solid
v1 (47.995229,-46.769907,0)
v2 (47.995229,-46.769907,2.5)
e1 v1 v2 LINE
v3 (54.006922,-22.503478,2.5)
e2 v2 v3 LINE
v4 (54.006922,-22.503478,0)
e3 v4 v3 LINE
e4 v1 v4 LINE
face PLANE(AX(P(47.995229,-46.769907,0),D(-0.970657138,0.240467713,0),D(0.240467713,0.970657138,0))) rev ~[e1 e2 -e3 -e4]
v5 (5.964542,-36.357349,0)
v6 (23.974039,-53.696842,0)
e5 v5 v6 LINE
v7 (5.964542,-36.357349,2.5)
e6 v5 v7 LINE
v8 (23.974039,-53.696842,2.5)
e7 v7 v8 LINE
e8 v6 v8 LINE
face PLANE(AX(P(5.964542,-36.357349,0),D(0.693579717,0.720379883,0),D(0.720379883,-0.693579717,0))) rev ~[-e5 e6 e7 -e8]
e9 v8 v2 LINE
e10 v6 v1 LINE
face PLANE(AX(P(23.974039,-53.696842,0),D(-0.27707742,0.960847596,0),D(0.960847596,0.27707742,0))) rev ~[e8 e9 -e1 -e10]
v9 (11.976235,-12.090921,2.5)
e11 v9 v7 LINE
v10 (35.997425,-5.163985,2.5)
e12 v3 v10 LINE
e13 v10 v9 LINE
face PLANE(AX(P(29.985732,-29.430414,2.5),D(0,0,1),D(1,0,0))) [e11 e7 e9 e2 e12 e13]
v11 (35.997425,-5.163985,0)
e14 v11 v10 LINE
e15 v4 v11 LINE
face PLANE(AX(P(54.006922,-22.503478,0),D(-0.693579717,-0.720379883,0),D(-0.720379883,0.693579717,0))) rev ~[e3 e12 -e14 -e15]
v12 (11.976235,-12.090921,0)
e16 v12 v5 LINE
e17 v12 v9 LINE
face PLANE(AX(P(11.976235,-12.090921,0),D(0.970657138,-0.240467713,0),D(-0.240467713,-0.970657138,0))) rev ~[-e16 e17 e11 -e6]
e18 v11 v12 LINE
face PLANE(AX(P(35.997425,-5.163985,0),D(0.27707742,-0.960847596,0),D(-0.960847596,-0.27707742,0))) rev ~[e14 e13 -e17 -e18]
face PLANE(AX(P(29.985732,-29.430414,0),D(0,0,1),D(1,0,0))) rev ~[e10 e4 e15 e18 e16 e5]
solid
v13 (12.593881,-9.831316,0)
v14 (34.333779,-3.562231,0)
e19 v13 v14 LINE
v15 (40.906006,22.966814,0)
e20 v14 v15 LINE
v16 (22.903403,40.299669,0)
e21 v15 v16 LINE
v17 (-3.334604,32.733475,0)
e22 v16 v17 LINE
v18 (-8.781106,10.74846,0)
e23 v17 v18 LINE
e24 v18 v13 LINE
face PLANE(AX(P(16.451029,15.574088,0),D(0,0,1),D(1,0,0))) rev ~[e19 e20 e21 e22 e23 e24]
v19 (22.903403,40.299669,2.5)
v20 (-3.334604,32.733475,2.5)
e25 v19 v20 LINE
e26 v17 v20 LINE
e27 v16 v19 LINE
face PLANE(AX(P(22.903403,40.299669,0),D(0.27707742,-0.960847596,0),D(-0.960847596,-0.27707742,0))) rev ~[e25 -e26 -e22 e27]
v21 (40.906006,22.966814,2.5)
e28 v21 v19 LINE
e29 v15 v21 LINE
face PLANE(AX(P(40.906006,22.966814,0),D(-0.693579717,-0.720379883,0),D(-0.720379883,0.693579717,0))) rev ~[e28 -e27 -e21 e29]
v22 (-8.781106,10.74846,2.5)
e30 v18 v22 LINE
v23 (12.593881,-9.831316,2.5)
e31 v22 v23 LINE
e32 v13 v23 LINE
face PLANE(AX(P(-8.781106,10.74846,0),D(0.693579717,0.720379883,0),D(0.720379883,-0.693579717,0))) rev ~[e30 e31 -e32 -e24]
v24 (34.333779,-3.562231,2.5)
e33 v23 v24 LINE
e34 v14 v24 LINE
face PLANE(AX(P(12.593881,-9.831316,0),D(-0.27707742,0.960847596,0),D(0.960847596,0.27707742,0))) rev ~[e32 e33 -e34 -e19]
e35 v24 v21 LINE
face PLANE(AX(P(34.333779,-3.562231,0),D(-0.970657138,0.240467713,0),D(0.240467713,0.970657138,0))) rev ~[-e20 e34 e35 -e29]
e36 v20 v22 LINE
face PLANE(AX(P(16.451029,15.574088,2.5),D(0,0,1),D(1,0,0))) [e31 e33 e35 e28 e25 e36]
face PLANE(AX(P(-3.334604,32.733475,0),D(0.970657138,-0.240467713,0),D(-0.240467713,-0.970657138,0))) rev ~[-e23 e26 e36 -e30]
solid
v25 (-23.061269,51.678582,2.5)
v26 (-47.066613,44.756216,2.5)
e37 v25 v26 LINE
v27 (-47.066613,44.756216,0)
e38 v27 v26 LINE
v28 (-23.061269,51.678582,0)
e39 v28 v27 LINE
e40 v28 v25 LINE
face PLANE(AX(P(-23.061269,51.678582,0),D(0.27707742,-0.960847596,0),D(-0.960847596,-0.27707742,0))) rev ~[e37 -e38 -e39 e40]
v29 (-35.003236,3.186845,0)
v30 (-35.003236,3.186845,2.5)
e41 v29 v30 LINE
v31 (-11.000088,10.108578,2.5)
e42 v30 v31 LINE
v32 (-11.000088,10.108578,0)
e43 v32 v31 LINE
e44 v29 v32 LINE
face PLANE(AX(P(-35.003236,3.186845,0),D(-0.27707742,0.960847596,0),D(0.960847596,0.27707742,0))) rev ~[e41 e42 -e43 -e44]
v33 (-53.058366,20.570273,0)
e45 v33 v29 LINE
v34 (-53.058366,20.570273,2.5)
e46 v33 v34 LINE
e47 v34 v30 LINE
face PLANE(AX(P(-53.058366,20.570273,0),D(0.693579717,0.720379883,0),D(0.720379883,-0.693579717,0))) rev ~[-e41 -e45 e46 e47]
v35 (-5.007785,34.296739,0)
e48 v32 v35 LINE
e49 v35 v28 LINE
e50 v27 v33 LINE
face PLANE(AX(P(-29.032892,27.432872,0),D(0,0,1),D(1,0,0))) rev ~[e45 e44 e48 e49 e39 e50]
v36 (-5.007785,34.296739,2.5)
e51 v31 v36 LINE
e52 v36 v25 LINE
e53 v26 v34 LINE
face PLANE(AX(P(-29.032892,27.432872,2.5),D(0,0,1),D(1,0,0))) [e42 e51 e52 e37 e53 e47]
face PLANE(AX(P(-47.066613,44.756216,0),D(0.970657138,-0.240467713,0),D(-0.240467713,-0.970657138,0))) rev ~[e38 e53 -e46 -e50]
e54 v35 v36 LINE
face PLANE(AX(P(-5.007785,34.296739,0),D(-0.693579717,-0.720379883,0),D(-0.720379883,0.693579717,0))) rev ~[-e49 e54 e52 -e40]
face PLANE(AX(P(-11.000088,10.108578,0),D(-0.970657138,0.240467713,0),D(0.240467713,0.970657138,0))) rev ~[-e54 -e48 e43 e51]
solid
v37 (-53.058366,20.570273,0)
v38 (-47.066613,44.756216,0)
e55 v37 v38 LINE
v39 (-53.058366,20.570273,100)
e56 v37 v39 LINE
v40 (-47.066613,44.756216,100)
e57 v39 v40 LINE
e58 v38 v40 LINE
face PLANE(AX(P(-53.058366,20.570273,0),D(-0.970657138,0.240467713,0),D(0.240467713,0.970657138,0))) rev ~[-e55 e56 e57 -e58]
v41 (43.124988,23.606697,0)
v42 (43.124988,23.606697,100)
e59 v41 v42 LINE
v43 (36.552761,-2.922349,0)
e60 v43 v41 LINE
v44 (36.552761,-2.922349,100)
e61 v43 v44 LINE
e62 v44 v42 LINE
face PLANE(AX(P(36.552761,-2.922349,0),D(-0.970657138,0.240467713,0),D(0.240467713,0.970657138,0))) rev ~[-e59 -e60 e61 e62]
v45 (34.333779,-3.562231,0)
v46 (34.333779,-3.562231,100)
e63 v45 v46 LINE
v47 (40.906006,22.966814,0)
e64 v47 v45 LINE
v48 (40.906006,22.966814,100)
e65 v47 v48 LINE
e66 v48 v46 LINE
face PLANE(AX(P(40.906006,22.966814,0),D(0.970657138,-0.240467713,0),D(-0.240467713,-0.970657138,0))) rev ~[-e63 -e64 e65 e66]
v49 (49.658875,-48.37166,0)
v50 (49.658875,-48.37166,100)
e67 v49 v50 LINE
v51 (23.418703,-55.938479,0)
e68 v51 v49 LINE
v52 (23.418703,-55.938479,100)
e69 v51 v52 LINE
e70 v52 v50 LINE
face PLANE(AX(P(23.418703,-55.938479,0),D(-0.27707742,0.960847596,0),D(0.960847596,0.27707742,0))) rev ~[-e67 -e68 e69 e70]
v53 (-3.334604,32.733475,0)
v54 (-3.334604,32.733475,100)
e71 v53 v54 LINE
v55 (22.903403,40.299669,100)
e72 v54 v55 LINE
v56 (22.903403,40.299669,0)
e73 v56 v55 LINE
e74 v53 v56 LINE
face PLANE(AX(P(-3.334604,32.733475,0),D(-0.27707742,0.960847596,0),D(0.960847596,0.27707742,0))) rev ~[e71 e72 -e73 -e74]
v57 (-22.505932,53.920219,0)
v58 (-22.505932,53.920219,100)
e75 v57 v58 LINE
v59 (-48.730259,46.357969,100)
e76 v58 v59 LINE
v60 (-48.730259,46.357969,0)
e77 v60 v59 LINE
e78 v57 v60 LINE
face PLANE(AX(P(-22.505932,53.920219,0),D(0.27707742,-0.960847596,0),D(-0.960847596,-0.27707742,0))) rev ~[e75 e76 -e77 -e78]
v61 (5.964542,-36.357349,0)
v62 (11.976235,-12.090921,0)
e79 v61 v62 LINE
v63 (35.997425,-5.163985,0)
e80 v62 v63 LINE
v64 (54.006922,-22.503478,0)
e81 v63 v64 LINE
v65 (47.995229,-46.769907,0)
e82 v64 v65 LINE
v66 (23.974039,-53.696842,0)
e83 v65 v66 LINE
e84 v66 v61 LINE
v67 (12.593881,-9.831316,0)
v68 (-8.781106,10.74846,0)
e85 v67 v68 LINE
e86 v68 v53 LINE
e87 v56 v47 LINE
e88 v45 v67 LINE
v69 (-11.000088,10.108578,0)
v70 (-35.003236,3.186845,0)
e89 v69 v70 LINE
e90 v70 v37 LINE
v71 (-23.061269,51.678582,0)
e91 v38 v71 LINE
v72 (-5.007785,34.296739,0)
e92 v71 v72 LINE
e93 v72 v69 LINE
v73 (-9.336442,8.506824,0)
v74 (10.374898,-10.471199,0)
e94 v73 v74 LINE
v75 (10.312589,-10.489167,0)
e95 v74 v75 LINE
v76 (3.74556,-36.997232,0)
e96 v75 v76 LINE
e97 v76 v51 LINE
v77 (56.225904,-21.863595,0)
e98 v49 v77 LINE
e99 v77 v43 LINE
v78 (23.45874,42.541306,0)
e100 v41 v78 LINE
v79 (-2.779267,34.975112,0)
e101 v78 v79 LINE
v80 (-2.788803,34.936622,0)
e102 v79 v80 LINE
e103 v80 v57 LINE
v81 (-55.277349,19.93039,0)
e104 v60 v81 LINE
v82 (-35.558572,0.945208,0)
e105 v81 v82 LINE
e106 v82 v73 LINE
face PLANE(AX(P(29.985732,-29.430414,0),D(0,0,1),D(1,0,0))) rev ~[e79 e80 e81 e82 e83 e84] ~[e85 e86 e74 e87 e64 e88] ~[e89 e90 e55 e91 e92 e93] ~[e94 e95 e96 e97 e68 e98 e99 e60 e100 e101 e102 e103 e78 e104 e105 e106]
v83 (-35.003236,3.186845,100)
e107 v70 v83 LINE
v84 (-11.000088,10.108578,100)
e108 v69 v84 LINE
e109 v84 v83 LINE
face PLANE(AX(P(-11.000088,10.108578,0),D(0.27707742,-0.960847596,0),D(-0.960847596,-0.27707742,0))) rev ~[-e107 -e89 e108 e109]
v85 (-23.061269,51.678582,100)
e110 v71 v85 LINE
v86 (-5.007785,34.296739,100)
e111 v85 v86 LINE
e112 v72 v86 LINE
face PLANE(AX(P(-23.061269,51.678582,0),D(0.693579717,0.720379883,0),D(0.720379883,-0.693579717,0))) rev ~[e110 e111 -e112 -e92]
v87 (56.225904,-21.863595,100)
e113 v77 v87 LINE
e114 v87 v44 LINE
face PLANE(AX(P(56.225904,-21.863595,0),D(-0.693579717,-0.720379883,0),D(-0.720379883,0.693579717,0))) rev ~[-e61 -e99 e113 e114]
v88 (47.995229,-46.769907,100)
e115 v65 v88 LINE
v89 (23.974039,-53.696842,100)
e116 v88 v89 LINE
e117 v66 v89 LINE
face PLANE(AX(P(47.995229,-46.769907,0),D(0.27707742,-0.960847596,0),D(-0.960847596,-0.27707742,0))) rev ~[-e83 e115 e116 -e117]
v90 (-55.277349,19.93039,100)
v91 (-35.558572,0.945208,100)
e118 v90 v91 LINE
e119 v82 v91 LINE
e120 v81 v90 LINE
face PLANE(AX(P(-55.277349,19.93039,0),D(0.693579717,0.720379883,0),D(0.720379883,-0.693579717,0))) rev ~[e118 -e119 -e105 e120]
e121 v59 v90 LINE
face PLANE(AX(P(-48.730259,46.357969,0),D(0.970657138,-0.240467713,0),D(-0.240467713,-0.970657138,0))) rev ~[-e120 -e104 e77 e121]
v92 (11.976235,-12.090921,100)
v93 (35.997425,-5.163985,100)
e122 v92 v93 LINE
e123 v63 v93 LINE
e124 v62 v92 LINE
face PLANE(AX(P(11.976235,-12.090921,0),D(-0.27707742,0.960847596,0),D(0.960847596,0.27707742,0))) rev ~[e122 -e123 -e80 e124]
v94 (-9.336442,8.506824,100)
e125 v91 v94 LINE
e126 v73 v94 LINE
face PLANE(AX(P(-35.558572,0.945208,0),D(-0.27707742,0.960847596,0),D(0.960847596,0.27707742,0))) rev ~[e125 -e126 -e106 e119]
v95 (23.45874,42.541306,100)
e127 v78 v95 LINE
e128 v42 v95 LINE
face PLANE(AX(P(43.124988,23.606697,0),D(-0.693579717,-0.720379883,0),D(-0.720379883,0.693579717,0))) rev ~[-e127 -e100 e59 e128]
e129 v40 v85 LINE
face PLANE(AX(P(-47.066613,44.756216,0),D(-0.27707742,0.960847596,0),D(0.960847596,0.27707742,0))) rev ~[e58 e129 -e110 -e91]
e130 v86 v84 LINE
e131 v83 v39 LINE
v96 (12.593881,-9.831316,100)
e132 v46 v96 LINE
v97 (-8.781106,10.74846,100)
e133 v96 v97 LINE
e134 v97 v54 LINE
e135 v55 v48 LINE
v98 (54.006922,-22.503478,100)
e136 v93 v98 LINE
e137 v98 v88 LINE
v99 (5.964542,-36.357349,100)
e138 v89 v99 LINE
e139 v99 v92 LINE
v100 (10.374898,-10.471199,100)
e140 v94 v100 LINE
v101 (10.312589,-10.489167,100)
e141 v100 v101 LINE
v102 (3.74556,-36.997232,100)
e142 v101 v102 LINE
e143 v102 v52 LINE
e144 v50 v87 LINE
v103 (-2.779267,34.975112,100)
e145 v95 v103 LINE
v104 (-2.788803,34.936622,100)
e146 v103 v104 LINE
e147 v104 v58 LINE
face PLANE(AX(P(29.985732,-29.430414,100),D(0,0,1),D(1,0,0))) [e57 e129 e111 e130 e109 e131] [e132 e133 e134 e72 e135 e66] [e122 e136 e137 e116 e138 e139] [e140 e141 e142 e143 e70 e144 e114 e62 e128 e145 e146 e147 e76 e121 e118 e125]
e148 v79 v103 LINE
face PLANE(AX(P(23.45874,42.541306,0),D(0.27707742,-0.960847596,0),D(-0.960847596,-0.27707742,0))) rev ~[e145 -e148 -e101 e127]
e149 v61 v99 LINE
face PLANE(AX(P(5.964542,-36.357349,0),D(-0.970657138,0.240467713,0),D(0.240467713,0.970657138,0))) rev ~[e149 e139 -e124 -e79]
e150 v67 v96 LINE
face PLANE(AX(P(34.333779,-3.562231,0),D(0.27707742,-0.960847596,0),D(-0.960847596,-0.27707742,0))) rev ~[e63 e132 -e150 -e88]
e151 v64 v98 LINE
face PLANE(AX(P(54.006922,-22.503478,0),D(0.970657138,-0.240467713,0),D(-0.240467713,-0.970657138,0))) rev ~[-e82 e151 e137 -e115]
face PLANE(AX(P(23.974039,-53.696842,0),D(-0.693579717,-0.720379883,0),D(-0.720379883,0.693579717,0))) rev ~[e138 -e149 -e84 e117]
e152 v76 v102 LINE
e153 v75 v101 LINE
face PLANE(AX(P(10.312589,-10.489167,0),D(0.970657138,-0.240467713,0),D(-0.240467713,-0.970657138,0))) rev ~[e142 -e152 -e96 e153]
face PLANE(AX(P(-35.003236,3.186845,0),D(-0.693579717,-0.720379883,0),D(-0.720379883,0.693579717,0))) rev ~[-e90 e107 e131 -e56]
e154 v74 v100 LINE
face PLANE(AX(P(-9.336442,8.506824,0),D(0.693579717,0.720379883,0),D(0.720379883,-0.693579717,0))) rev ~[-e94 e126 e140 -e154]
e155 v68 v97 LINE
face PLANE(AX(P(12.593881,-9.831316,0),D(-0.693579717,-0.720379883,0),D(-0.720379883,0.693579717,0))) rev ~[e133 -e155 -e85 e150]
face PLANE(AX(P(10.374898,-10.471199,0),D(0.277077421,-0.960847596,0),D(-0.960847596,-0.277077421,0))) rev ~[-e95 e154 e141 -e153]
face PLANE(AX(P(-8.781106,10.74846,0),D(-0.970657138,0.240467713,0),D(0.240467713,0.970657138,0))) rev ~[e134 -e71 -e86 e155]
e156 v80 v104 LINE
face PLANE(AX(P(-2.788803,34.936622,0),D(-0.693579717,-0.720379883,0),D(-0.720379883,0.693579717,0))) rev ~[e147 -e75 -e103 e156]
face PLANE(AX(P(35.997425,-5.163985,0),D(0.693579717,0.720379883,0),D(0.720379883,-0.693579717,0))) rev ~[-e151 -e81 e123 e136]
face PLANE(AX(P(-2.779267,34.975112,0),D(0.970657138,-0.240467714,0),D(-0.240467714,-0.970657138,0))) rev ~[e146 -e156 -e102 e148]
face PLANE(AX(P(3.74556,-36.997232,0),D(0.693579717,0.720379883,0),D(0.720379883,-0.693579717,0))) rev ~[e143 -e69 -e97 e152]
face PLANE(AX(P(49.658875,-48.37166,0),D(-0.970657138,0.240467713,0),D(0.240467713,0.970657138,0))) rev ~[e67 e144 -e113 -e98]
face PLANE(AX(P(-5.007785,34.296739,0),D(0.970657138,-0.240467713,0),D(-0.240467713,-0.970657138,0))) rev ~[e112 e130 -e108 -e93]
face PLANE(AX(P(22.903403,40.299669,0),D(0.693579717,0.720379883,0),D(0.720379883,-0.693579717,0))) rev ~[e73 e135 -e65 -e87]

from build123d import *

# Parameters (mm, degrees)
F1_DEPTH = 2.5
F2_DEPTH = 100


with BuildPart() as f1:
    # F0 (on Top) → F1 (new body)
    with BuildSketch(Plane.XY):
        Polygon((23.9740391848, -53.6968420277), (47.9952290893, -46.7699065169), (54.0069219188, -22.503478075), (35.9974248438, -5.163985144), (11.9762349393, -12.0909206548), (5.9645421098, -36.3573490966), align=None)
    extrude(amount=F1_DEPTH)


with BuildPart() as f1b:
    # F0 (on Top) → F1, piece 2 (new body)
    with BuildSketch(Plane.XY):
        Polygon((12.5938805561, -9.8313160485), (34.3337787663, -3.5622313982), (40.9060056961, 22.9668144158), (22.9034034312, 40.2996690431), (-3.3346036331, 32.7334750457), (-8.7811057818, 10.7484604419), align=None)
    extrude(amount=F1_DEPTH)


with BuildPart() as f1c:
    # F0 (on Top) → F1, piece 3 (new body)
    with BuildSketch(Plane.XY):
        Polygon((-35.0032359624, 3.1868448251), (-11.0000882551, 10.1085775488), (-5.0077850981, 34.2967388346), (-23.0612686958, 51.6785818655), (-47.0666128749, 44.7562157503), (-53.0583663292, 20.5702733605), align=None)
    extrude(amount=F1_DEPTH)


with BuildPart() as f2:
    # F0 (on Top) → F2 (new body)
    with BuildSketch(Plane.XY):
        Polygon((56.225904392, -21.8635951819), (36.5527612395, -2.9223485051), (34.3337787663, -3.5622313982), (12.5938805561, -9.8313160485), (10.3748980829, -10.4711989416), (10.3125888618, -10.489166909), (3.7455596365, -36.9972319897), (23.418702789, -55.9384786666), (49.6588751668, -48.3716602627), align=None)
        Polygon((54.0069219188, -22.503478075), (47.9952290893, -46.7699065169), (23.9740391848, -53.6968420277), (5.9645421098, -36.3573490966), (11.9762349393, -12.0909206548), (35.9974248438, -5.163985144), align=None, mode=Mode.SUBTRACT)
        Polygon((34.3337787663, -3.5622313982), (36.5527612395, -2.9223485051), (43.1249881693, 23.6066973089), (23.458739827, 42.541305682), (-2.7792672374, 34.9751116846), (-2.7888026249, 34.9366217277), (-3.3346036331, 32.7334750457), (22.9034034312, 40.2996690431), (40.9060056961, 22.9668144158), align=None)
        Polygon((10.3748980829, -10.4711989416), (12.5938805561, -9.8313160485), (-8.7811057818, 10.7484604419), (-9.3364421776, 8.506823803), align=None)
        Polygon((-9.3364421776, 8.506823803), (-8.7811057818, 10.7484604419), (-3.3346036331, 32.7334750457), (-2.7888026249, 34.9366217277), (-22.5059323001, 53.9202185044), (-48.7302589523, 46.3579694961), (-55.2773488024, 19.9303904674), (-35.5585723582, 0.9452081862), align=None)
        Polygon((-5.0077850981, 34.2967388346), (-11.0000882551, 10.1085775488), (-35.0032359624, 3.1868448251), (-53.0583663292, 20.5702733605), (-47.0666128749, 44.7562157503), (-23.0612686958, 51.6785818655), align=None, mode=Mode.SUBTRACT)
    extrude(amount=F2_DEPTH)


solid = Compound([f1.part, f1b.part, f1c.part, f2.part])
